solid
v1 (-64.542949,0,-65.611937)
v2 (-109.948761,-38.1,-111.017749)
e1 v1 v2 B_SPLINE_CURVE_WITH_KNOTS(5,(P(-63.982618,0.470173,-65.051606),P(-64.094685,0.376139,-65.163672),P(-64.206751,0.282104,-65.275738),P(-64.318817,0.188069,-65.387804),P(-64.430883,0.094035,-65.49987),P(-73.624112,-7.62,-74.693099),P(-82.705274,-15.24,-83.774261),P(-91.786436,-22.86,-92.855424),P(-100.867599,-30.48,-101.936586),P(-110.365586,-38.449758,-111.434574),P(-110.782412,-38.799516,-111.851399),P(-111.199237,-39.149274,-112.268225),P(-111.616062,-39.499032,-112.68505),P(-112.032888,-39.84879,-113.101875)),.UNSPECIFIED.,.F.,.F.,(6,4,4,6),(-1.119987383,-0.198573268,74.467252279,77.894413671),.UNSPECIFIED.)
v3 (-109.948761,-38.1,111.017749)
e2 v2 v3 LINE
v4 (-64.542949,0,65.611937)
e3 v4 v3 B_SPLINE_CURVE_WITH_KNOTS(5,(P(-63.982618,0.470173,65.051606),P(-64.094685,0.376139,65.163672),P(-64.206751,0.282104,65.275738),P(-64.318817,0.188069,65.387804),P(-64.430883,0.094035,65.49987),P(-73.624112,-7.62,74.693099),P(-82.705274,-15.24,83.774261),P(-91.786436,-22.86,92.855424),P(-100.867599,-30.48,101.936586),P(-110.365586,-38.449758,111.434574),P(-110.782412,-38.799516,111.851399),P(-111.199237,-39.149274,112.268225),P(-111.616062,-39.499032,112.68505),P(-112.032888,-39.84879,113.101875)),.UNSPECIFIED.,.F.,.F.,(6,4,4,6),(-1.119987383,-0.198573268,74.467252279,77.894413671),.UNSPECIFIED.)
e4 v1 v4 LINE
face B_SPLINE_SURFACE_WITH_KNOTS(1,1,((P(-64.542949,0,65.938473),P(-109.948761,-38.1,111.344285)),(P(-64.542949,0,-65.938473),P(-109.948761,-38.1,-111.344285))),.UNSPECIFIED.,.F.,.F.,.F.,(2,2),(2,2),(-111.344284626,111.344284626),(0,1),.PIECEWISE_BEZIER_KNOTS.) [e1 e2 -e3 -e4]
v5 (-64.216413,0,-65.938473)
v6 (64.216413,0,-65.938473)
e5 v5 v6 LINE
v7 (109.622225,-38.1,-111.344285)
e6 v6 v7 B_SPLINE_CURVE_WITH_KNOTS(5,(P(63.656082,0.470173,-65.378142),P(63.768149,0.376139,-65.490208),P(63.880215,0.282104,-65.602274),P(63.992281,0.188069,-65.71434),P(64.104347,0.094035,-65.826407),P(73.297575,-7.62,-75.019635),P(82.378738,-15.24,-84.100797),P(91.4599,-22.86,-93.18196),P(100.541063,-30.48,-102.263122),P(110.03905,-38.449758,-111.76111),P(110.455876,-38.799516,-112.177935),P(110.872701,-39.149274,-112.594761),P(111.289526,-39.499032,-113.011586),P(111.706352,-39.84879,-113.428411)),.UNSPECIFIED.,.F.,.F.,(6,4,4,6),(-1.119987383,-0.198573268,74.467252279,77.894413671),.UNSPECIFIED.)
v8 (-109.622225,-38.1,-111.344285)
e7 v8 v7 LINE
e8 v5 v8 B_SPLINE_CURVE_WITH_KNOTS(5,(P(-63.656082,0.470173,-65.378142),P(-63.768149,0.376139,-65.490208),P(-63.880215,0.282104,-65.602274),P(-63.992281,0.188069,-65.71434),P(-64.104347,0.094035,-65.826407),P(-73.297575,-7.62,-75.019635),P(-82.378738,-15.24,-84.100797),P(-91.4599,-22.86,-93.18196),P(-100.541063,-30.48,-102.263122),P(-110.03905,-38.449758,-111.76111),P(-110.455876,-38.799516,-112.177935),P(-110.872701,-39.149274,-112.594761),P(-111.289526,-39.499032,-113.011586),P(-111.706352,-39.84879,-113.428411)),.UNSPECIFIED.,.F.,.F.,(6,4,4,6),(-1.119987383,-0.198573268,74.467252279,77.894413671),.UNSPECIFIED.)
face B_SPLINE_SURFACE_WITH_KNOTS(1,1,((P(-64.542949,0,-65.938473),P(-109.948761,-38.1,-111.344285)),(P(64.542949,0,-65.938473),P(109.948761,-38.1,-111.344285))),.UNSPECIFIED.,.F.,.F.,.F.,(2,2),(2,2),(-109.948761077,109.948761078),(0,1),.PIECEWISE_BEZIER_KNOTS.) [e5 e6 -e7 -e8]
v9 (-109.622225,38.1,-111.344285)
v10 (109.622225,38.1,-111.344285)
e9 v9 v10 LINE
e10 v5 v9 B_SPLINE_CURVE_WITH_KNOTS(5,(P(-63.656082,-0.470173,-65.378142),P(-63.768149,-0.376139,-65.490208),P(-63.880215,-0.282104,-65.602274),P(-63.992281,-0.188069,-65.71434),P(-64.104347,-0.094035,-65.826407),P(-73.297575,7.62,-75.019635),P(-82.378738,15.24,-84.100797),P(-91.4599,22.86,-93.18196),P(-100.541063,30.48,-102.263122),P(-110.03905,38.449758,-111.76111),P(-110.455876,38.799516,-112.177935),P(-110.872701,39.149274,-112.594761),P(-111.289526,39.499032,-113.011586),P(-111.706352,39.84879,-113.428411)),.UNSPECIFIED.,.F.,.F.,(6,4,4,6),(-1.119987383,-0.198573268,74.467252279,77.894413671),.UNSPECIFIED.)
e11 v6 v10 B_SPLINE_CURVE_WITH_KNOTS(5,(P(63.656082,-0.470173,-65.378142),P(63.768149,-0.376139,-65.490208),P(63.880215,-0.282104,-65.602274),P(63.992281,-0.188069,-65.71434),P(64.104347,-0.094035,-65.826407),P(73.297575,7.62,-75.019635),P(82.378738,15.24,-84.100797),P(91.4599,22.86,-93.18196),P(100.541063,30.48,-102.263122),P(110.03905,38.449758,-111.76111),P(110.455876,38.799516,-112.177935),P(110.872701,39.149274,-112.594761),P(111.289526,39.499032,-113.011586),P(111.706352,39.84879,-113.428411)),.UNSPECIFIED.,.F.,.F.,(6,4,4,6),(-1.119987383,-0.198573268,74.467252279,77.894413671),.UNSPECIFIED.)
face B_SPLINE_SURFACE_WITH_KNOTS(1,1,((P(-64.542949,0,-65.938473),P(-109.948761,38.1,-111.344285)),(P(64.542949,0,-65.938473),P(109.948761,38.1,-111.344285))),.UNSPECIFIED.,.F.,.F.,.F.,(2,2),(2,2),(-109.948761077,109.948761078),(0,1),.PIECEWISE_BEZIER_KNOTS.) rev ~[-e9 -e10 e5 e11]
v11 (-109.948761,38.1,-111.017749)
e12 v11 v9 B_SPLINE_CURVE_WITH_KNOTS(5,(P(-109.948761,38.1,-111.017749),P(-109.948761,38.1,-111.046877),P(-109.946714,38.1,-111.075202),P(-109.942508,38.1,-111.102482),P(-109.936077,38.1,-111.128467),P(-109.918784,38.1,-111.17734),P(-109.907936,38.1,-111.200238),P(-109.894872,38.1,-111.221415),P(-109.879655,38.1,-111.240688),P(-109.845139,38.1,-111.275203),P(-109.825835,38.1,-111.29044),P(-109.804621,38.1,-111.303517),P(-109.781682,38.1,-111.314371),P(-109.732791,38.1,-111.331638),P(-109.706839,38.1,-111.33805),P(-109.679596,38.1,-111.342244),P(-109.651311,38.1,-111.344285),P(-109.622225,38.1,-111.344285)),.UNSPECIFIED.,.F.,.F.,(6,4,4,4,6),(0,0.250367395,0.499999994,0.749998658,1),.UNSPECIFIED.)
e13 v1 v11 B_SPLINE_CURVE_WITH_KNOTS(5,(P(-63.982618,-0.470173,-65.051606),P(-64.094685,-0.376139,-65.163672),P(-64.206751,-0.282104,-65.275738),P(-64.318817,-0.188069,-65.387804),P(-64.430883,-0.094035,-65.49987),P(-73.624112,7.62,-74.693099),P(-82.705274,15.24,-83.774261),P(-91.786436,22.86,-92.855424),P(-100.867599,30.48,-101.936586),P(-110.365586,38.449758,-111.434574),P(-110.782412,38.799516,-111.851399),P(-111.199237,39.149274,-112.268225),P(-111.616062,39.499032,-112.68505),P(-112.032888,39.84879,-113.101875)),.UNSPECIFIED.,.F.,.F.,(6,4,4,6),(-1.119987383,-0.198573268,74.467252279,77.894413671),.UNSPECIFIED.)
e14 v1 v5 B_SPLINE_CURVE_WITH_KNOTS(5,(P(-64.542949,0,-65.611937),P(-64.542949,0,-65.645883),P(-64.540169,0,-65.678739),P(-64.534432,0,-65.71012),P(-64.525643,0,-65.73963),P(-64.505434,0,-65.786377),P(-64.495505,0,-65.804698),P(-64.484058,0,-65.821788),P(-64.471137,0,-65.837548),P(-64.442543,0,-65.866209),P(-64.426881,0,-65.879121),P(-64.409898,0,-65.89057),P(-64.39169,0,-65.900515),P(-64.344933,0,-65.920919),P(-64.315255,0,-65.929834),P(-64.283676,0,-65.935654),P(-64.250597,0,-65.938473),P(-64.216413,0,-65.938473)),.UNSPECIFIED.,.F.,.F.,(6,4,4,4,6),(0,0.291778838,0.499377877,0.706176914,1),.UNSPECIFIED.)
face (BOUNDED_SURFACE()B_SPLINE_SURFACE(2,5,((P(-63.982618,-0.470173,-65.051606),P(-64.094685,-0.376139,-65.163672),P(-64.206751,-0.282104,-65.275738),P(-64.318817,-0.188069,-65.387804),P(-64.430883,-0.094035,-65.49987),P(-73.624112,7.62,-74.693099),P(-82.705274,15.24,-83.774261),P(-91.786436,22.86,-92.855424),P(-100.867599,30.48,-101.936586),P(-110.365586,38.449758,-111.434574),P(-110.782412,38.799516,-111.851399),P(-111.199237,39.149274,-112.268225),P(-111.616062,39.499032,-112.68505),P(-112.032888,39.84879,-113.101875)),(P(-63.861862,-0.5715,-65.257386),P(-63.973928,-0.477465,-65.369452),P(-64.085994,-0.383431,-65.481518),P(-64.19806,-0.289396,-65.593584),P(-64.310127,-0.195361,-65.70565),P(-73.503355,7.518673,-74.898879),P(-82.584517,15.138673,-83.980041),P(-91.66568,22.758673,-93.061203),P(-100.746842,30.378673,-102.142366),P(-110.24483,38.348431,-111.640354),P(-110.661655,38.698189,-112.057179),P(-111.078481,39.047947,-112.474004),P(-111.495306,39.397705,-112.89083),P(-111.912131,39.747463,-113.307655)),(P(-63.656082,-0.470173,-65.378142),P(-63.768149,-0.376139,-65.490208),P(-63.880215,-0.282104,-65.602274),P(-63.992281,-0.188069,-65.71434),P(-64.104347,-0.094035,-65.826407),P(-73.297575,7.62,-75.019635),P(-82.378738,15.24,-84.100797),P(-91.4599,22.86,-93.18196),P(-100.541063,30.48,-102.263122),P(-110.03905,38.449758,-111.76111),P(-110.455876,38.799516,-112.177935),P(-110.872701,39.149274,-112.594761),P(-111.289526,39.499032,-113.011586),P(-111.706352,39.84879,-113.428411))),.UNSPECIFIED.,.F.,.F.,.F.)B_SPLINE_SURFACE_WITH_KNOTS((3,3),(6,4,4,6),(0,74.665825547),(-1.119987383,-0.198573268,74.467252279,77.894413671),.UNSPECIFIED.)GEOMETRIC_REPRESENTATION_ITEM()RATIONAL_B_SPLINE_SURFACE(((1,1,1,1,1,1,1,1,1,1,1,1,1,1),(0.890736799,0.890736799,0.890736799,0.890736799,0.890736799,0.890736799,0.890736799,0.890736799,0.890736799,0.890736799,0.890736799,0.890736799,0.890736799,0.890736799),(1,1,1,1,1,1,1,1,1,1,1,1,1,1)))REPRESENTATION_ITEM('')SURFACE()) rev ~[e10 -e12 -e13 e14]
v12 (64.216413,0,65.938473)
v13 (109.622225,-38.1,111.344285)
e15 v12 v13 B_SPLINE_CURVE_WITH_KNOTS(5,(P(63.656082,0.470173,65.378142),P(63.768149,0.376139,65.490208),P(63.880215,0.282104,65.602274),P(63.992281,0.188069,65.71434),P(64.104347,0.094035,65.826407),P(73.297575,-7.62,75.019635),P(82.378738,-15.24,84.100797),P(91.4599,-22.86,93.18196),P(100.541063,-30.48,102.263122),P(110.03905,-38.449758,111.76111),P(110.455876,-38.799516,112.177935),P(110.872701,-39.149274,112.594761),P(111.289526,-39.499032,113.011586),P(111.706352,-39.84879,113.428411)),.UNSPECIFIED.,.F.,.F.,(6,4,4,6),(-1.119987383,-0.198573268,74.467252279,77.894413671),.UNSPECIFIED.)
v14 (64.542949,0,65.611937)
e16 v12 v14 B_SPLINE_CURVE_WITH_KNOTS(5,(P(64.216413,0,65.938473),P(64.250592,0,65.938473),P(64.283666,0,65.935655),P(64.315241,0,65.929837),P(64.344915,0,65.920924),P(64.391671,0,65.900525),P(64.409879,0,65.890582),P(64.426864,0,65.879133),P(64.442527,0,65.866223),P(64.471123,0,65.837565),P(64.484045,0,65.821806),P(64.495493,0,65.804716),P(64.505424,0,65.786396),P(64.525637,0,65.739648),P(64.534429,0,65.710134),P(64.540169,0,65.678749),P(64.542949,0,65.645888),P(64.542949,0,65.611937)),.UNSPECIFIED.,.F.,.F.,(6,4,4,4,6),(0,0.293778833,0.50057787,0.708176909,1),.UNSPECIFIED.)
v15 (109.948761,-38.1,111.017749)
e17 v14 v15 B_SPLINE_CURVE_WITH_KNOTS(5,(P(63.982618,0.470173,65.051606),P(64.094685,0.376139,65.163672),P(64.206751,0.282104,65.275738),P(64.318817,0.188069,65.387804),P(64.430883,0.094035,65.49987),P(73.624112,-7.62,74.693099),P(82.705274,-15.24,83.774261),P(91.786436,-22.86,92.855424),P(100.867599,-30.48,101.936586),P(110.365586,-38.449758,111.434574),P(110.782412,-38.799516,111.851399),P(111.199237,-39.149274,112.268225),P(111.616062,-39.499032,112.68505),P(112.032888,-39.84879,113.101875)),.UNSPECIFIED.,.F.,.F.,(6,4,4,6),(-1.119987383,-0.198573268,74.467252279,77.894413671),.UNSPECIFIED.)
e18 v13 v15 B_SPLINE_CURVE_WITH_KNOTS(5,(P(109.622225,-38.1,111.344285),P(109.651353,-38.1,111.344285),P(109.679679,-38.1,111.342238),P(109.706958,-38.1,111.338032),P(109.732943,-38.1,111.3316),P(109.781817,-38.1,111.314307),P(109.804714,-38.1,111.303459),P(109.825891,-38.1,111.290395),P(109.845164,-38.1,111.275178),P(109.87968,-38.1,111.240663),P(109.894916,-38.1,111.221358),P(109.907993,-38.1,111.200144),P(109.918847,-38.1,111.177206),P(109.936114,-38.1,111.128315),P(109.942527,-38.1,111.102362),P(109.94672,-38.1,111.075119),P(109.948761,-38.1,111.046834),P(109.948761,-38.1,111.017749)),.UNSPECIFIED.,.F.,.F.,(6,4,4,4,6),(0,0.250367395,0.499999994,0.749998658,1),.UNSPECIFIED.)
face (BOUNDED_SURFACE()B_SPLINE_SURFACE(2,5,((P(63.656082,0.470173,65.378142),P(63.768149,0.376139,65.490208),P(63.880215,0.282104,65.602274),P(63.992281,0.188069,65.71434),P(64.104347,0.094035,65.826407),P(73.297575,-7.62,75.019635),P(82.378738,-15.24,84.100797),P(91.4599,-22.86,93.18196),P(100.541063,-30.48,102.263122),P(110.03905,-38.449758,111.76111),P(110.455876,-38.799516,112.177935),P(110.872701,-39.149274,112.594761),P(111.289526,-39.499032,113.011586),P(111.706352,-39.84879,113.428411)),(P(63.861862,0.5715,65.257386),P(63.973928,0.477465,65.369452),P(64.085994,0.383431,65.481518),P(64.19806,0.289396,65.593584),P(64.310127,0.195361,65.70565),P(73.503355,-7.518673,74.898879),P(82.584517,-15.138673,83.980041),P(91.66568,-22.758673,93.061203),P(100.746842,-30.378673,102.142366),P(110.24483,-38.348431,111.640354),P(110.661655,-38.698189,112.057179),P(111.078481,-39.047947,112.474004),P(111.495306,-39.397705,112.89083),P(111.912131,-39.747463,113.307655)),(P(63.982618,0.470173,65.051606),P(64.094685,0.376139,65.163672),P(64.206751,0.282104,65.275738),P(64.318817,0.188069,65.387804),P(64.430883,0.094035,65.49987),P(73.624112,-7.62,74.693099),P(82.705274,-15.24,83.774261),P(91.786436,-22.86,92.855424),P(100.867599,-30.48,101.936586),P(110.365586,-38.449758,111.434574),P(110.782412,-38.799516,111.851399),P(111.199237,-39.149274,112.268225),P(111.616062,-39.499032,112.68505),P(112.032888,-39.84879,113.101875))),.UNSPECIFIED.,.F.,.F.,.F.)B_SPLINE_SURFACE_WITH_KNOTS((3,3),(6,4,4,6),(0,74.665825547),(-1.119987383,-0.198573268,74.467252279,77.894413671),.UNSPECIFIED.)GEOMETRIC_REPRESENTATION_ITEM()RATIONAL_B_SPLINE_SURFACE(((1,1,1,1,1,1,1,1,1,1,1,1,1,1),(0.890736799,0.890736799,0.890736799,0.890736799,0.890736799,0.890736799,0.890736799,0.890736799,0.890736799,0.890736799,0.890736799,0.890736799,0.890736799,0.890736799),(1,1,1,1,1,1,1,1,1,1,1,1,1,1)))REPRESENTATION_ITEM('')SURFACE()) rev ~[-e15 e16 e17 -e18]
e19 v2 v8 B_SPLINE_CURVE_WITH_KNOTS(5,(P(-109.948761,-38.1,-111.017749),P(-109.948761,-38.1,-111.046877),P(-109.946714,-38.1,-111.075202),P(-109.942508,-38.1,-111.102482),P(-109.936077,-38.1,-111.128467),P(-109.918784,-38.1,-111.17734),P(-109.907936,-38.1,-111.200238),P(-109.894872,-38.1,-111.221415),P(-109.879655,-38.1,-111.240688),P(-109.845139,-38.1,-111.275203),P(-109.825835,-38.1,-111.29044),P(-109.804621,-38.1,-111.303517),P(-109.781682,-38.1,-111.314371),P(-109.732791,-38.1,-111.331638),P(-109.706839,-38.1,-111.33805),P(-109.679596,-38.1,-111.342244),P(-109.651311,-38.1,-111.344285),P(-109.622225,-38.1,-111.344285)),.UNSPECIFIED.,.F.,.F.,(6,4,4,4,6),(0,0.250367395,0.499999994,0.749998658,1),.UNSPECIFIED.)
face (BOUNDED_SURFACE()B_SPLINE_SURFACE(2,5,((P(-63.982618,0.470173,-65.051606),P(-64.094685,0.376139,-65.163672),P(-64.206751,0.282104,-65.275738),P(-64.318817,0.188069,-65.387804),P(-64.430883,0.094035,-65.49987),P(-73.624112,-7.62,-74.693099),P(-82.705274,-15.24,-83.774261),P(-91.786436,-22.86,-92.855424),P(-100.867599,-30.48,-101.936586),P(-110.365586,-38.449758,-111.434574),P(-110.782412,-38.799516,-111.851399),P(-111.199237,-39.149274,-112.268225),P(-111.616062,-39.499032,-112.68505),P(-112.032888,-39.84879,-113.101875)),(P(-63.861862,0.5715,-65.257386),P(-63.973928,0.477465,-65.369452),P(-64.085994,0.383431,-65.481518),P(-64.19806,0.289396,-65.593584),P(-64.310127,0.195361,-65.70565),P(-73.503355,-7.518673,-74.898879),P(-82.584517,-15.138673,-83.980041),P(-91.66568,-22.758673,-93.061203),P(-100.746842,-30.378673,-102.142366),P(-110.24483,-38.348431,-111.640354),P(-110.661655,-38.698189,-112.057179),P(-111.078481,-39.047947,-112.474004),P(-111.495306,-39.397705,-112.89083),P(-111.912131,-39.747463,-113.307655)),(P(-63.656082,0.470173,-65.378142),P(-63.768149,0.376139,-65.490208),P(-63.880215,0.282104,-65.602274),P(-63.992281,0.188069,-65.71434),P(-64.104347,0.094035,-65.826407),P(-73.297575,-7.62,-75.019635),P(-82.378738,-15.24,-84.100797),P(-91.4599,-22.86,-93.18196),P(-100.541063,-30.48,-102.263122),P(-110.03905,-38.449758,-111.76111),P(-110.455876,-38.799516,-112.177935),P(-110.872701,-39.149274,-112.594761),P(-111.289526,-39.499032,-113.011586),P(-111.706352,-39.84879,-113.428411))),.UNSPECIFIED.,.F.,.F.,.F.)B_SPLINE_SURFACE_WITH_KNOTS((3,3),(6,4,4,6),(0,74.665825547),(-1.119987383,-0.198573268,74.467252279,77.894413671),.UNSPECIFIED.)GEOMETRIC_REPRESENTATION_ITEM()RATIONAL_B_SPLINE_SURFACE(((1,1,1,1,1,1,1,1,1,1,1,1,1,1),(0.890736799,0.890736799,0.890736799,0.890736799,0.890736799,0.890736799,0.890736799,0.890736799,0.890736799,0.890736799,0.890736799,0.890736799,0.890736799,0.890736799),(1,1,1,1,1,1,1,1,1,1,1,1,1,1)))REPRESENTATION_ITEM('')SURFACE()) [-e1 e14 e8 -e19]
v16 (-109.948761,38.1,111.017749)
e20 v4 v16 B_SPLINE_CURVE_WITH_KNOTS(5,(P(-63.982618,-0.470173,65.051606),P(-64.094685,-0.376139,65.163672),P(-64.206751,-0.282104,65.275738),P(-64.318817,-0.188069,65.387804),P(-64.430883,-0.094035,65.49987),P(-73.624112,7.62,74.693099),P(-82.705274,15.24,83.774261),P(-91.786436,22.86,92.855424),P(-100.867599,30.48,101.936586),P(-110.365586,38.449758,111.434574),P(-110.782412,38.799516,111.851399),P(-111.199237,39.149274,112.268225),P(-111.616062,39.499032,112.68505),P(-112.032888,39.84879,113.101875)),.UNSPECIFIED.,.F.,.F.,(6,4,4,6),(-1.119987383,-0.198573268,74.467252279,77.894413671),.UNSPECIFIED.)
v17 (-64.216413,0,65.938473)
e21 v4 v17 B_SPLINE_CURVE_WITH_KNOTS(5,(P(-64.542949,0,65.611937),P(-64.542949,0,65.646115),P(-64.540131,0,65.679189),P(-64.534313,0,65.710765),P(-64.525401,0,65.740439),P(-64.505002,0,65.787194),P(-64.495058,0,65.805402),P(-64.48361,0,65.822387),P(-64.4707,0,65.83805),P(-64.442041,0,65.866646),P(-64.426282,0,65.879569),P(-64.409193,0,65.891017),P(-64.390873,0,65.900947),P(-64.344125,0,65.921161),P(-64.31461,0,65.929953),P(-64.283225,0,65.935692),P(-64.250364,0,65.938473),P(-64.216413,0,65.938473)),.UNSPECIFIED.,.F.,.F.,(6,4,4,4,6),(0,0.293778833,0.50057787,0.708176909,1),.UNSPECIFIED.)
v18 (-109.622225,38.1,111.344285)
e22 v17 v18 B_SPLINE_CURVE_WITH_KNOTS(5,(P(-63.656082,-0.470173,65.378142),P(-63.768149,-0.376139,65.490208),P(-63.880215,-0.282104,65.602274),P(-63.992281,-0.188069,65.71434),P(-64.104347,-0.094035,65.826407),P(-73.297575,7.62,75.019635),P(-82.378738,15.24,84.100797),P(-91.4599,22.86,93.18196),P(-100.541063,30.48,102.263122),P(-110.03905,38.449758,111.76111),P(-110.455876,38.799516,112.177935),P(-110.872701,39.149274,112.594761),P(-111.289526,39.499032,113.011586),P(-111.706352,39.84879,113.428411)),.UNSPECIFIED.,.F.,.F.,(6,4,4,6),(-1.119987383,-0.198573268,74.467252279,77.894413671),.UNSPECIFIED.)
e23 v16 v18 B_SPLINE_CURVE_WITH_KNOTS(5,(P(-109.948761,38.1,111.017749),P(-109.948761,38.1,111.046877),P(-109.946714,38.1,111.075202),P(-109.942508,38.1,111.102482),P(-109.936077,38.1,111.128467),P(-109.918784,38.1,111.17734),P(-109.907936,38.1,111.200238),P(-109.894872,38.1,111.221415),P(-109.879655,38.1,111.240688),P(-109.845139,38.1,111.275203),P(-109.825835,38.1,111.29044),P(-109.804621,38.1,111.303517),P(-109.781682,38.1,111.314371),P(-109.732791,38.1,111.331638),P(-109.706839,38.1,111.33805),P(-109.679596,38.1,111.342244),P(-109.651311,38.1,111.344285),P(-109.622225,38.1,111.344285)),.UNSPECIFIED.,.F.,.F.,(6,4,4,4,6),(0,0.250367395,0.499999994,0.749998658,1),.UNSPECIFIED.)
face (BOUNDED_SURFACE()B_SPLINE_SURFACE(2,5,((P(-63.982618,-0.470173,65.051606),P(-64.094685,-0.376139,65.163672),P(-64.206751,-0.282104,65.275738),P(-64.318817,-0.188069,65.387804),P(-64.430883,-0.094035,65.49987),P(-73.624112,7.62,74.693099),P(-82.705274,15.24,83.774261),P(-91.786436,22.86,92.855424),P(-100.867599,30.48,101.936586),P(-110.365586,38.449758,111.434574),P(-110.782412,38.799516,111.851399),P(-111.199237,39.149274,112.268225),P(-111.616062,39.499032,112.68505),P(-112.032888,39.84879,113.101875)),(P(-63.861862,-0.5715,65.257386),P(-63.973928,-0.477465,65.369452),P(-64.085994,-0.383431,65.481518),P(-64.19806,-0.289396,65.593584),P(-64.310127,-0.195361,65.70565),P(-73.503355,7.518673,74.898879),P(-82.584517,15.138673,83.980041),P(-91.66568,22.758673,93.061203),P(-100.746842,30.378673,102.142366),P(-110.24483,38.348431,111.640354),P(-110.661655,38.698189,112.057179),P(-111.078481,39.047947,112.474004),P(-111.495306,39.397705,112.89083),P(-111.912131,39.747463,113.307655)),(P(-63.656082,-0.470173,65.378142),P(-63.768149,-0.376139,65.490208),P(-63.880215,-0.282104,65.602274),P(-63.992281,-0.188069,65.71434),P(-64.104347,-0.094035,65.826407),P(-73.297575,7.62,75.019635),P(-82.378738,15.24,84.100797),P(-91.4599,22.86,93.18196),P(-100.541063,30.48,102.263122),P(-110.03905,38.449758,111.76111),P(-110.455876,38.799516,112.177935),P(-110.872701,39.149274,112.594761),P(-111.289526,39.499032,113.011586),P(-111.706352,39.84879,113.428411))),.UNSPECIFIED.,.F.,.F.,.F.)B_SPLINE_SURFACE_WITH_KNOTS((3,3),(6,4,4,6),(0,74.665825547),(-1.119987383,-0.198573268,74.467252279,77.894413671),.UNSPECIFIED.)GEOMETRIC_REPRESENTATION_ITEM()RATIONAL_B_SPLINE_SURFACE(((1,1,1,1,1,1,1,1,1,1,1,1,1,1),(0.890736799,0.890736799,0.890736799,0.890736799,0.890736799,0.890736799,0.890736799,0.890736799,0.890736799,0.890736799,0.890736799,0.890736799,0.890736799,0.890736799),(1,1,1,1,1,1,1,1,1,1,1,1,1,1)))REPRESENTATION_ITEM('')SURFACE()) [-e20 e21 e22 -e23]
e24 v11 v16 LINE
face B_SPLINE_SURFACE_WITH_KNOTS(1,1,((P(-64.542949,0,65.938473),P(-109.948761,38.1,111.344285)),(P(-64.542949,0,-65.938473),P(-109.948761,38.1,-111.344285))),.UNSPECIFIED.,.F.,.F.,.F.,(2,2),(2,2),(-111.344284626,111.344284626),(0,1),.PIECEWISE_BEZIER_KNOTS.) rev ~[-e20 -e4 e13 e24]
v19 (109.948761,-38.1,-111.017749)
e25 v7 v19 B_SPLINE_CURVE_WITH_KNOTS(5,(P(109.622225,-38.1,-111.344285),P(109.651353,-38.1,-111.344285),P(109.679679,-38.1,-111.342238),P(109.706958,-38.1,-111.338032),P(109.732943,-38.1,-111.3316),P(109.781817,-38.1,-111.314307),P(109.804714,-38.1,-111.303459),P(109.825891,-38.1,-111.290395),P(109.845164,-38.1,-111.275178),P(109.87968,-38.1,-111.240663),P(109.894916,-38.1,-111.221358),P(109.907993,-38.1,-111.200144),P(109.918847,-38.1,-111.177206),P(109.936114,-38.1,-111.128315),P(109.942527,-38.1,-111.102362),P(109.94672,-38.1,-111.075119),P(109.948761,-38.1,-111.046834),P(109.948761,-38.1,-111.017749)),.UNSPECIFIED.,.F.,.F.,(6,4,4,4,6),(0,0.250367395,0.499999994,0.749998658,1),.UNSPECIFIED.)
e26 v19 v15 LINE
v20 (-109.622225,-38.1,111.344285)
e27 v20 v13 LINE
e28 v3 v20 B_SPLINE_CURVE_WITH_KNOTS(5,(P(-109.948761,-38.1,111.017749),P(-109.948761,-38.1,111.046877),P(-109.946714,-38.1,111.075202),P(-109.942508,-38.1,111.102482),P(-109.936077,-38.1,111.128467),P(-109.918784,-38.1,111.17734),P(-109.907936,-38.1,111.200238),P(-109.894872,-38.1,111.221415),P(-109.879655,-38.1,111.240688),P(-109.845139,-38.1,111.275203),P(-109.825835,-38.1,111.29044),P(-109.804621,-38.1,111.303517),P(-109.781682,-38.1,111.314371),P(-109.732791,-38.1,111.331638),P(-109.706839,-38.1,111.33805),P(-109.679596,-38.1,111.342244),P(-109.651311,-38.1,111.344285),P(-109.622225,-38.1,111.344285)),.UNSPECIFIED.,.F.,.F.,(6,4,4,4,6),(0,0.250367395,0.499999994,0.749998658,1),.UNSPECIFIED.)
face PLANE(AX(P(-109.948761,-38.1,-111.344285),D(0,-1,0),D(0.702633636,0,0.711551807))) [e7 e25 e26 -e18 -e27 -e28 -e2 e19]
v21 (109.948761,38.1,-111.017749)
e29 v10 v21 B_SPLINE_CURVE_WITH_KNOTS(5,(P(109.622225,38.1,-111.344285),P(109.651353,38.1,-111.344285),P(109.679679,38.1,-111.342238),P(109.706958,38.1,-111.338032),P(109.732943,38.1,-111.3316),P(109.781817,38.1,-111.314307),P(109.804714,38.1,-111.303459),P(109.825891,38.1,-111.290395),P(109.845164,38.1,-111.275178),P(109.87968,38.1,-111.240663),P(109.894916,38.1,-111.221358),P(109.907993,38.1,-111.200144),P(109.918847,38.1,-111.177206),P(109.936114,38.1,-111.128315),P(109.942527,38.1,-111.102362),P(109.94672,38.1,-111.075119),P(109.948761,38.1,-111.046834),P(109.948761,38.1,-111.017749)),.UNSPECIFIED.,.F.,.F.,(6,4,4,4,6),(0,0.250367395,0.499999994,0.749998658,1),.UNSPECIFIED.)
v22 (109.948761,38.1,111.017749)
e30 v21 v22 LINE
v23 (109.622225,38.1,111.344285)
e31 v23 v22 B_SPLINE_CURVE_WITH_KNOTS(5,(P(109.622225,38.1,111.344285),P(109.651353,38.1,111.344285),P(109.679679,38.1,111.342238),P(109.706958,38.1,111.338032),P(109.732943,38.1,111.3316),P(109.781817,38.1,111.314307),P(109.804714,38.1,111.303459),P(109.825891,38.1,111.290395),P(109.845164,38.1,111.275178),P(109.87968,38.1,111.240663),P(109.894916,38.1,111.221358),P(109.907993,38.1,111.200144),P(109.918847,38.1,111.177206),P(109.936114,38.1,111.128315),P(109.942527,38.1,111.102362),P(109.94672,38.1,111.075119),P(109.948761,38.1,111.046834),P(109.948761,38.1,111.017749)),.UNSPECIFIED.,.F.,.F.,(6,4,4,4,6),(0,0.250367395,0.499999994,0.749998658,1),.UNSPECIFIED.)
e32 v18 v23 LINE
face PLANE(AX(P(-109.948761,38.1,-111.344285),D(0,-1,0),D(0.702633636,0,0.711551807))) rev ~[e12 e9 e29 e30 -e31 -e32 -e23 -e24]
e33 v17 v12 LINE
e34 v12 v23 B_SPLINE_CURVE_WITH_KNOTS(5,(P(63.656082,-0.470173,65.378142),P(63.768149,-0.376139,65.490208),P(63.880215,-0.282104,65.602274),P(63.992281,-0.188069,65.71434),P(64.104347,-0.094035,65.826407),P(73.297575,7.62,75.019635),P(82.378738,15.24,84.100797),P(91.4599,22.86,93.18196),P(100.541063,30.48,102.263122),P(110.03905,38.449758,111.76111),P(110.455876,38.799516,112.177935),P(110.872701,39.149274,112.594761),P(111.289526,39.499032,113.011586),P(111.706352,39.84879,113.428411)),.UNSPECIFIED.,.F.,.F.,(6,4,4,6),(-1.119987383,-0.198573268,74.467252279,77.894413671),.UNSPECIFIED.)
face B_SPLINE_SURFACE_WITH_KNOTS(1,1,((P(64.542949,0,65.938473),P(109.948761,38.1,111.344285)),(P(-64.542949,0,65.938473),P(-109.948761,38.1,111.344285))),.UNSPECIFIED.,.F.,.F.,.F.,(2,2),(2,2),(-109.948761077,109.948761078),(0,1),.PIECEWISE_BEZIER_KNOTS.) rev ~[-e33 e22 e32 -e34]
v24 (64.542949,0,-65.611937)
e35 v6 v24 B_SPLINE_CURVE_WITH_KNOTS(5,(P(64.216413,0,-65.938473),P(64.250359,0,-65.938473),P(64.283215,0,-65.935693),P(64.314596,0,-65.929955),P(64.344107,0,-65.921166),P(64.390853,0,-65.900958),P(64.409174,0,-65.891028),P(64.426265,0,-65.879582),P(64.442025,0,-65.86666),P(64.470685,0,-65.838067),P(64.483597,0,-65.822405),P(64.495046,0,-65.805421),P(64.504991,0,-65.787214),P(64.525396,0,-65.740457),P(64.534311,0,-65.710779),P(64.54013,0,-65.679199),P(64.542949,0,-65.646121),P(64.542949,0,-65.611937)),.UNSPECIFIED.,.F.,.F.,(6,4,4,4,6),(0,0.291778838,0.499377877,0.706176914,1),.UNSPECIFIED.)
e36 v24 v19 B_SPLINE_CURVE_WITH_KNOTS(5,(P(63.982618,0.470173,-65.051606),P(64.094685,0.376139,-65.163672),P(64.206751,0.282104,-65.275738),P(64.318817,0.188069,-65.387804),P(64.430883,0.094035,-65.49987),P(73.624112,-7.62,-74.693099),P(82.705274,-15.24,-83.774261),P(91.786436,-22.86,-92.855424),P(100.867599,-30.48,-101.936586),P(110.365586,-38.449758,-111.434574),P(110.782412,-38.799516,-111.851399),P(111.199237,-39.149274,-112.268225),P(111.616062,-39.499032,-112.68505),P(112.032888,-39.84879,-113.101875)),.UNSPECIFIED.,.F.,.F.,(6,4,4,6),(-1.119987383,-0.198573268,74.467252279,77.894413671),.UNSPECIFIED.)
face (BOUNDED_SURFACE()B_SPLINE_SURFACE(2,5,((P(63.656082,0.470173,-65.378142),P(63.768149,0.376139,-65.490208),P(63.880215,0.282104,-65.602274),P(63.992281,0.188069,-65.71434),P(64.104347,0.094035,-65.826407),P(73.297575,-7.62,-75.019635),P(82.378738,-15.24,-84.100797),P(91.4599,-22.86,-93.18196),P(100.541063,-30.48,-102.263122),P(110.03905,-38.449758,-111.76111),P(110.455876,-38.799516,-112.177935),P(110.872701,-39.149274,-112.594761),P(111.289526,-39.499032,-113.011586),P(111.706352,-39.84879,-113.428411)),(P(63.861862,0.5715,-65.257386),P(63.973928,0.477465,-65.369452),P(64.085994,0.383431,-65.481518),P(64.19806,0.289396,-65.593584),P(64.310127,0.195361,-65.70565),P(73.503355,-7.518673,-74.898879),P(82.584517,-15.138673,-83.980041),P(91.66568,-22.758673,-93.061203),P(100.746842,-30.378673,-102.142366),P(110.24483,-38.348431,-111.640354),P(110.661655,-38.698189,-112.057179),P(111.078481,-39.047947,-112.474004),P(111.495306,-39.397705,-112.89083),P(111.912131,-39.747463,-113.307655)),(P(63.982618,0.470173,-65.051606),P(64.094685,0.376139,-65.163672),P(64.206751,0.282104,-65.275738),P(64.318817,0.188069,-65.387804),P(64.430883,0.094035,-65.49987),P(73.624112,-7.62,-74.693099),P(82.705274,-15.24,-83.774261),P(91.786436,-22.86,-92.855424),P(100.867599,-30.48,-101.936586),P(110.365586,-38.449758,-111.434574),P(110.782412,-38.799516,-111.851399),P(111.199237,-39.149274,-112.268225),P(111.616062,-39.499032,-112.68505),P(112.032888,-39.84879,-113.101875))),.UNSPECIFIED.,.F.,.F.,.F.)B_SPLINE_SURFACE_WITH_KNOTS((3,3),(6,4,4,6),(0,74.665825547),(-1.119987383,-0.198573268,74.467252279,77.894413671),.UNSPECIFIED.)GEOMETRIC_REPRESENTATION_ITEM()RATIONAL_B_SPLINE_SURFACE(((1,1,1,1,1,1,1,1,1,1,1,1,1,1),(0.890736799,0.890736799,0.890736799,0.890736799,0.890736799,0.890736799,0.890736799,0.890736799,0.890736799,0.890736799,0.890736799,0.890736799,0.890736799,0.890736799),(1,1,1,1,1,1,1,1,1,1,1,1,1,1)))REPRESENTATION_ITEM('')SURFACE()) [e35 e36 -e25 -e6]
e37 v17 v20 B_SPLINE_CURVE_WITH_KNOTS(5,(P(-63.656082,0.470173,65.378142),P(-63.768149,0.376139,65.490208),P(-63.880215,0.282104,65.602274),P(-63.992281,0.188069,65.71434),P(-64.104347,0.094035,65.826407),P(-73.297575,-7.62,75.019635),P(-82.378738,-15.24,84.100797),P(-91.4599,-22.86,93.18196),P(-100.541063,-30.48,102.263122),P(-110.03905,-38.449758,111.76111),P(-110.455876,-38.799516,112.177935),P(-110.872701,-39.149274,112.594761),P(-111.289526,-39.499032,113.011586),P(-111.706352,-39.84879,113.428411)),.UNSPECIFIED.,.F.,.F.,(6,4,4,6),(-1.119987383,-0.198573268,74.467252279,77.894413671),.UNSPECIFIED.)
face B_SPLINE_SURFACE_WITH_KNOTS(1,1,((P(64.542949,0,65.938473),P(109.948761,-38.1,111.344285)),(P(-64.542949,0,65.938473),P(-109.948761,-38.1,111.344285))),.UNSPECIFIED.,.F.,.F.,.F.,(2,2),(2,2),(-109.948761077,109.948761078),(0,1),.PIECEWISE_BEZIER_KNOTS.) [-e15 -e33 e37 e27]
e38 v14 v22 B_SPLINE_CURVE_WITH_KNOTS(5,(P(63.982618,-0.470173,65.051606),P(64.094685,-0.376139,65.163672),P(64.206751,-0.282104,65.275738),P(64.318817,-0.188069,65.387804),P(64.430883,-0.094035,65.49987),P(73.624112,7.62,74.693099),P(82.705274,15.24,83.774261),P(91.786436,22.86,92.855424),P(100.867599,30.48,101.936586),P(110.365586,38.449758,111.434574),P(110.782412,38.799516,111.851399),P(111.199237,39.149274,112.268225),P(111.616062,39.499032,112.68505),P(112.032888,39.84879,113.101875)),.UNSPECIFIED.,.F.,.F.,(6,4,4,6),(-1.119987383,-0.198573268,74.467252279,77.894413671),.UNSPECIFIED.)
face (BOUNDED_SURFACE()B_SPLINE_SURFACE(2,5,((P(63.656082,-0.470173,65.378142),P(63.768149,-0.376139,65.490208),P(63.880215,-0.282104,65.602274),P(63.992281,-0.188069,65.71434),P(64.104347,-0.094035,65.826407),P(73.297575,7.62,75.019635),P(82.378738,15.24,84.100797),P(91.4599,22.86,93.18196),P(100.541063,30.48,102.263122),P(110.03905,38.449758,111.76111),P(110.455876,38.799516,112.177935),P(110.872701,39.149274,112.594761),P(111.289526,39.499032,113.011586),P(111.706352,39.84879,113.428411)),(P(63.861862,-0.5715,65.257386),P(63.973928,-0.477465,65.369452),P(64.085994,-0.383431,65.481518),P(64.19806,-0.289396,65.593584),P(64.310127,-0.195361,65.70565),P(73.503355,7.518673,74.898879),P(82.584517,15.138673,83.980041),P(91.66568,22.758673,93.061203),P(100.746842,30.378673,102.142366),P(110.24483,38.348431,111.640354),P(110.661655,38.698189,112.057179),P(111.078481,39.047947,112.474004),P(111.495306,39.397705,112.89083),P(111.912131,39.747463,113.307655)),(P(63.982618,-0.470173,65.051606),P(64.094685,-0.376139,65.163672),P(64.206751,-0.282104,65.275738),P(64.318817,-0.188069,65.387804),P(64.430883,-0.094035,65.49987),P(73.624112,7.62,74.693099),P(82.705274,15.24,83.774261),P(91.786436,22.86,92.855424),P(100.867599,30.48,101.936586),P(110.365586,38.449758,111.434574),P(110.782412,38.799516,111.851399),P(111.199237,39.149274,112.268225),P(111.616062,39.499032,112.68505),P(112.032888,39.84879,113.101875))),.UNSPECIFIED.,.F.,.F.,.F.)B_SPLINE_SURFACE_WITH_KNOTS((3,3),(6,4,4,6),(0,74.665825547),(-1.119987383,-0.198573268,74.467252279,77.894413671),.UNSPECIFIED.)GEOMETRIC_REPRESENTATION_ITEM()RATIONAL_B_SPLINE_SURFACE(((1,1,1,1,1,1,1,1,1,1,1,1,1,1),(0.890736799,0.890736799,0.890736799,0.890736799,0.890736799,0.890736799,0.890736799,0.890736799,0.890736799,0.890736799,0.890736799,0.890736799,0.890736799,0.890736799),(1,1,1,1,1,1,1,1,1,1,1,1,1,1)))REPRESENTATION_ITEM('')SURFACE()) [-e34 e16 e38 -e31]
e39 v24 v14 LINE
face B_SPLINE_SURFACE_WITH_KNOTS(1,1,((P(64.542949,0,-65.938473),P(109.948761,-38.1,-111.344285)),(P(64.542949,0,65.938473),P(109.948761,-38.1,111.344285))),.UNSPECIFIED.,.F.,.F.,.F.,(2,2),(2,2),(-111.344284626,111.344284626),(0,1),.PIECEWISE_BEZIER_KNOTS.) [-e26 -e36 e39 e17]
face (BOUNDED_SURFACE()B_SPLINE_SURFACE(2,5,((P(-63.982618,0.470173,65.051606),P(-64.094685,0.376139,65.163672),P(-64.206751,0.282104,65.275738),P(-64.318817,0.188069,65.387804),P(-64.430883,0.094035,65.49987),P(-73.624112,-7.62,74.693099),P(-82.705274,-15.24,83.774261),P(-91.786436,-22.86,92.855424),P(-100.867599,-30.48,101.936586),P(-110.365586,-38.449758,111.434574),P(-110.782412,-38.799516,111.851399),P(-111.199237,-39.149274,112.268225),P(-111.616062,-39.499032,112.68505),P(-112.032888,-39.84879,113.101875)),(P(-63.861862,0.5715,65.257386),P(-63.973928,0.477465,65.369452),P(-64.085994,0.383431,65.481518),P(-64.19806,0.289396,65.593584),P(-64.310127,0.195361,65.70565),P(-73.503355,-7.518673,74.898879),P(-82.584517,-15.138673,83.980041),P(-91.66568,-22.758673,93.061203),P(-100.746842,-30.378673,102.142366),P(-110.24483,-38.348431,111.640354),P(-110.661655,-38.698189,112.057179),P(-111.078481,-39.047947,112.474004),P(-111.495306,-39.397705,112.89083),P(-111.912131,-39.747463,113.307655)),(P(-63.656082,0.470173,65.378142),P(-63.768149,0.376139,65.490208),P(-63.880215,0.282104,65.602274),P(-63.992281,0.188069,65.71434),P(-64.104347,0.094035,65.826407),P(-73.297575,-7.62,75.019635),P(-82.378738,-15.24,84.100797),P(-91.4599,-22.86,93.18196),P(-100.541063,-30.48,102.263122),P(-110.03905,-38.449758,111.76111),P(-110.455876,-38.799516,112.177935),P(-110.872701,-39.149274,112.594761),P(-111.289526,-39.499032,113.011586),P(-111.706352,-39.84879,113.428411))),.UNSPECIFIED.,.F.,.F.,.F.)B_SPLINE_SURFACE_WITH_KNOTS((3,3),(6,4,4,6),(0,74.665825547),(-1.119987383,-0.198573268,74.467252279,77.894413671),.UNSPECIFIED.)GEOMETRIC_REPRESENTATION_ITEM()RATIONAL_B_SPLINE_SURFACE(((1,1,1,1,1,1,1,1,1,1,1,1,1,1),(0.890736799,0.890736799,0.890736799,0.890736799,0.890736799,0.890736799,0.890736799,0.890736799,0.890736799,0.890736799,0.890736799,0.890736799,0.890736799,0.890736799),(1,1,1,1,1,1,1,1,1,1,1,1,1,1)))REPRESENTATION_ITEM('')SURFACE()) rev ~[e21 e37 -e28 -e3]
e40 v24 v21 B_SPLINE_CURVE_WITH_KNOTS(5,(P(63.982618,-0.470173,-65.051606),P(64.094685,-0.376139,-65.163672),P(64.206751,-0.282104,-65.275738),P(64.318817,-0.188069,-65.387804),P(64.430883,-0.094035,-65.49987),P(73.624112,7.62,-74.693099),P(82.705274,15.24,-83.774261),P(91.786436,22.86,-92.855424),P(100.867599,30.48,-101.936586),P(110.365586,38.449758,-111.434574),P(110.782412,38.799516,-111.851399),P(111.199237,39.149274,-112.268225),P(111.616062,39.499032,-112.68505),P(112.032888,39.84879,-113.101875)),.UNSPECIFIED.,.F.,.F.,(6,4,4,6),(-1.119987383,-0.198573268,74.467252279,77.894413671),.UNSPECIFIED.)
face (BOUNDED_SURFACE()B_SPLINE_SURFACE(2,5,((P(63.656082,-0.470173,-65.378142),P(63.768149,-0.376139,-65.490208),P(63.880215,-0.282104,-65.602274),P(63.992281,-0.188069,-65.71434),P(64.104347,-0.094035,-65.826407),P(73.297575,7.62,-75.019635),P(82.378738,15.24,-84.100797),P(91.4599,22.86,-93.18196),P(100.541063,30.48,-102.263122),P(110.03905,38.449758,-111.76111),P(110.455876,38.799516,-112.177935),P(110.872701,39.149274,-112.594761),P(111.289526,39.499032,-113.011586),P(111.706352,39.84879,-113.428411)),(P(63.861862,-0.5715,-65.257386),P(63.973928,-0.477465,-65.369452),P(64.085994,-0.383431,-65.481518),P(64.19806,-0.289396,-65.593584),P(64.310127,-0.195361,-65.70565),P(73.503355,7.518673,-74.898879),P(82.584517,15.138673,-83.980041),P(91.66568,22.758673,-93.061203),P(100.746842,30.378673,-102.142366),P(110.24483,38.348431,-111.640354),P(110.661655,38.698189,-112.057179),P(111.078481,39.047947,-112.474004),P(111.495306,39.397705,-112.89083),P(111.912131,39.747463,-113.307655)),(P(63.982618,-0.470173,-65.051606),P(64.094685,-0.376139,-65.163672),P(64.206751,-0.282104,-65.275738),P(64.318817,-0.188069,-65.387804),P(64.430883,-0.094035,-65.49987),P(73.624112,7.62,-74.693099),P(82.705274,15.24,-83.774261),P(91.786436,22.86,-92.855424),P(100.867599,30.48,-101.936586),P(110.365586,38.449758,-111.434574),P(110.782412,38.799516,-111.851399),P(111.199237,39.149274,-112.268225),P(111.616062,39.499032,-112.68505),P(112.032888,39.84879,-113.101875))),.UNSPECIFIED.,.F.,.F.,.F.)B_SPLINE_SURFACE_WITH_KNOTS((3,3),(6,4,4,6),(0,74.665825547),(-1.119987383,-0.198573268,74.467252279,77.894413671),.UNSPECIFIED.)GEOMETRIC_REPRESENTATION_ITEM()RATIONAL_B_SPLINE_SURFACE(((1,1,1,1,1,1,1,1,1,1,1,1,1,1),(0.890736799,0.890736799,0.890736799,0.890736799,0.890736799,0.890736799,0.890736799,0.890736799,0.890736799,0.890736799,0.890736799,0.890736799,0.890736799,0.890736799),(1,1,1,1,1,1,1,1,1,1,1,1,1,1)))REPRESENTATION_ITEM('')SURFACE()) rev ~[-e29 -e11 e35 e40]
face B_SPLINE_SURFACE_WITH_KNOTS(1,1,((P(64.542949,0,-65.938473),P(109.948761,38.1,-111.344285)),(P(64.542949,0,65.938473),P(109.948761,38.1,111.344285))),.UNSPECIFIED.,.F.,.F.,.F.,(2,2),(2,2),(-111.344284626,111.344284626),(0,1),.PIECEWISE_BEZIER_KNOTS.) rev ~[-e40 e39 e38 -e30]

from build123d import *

# Parameters (mm, degrees)
F0_W     = 129.0858983994
F0_H     = 131.8769454956
F1_DEPTH = 38.1
F1_TAPER = -50
F2_R     = 0.508


with BuildPart() as f1:
    # F0 (on Front) → F1 (new body, symmetric)
    with BuildSketch(Plane.XZ):
        Rectangle(F0_W, F0_H)
    extrude(amount=F1_DEPTH, both=True, taper=F1_TAPER)

    # F2
    f2_edges = [f1.edges().sort_by_distance(p)[0] for p in [
        (-87.245855, -19.05, -88.641379),
        (-87.245855, -19.05, 88.641379),
        (-87.245855, 19.05, -88.641379),
        (-87.245855, 19.05, 88.641379),
        (87.245855, -19.05, -88.641379),
        (87.245855, -19.05, 88.641379),
        (87.245855, 19.05, -88.641379),
        (87.245855, 19.05, 88.641379),
    ]]
    fillet(f2_edges, radius=F2_R)


solid = f1.part
